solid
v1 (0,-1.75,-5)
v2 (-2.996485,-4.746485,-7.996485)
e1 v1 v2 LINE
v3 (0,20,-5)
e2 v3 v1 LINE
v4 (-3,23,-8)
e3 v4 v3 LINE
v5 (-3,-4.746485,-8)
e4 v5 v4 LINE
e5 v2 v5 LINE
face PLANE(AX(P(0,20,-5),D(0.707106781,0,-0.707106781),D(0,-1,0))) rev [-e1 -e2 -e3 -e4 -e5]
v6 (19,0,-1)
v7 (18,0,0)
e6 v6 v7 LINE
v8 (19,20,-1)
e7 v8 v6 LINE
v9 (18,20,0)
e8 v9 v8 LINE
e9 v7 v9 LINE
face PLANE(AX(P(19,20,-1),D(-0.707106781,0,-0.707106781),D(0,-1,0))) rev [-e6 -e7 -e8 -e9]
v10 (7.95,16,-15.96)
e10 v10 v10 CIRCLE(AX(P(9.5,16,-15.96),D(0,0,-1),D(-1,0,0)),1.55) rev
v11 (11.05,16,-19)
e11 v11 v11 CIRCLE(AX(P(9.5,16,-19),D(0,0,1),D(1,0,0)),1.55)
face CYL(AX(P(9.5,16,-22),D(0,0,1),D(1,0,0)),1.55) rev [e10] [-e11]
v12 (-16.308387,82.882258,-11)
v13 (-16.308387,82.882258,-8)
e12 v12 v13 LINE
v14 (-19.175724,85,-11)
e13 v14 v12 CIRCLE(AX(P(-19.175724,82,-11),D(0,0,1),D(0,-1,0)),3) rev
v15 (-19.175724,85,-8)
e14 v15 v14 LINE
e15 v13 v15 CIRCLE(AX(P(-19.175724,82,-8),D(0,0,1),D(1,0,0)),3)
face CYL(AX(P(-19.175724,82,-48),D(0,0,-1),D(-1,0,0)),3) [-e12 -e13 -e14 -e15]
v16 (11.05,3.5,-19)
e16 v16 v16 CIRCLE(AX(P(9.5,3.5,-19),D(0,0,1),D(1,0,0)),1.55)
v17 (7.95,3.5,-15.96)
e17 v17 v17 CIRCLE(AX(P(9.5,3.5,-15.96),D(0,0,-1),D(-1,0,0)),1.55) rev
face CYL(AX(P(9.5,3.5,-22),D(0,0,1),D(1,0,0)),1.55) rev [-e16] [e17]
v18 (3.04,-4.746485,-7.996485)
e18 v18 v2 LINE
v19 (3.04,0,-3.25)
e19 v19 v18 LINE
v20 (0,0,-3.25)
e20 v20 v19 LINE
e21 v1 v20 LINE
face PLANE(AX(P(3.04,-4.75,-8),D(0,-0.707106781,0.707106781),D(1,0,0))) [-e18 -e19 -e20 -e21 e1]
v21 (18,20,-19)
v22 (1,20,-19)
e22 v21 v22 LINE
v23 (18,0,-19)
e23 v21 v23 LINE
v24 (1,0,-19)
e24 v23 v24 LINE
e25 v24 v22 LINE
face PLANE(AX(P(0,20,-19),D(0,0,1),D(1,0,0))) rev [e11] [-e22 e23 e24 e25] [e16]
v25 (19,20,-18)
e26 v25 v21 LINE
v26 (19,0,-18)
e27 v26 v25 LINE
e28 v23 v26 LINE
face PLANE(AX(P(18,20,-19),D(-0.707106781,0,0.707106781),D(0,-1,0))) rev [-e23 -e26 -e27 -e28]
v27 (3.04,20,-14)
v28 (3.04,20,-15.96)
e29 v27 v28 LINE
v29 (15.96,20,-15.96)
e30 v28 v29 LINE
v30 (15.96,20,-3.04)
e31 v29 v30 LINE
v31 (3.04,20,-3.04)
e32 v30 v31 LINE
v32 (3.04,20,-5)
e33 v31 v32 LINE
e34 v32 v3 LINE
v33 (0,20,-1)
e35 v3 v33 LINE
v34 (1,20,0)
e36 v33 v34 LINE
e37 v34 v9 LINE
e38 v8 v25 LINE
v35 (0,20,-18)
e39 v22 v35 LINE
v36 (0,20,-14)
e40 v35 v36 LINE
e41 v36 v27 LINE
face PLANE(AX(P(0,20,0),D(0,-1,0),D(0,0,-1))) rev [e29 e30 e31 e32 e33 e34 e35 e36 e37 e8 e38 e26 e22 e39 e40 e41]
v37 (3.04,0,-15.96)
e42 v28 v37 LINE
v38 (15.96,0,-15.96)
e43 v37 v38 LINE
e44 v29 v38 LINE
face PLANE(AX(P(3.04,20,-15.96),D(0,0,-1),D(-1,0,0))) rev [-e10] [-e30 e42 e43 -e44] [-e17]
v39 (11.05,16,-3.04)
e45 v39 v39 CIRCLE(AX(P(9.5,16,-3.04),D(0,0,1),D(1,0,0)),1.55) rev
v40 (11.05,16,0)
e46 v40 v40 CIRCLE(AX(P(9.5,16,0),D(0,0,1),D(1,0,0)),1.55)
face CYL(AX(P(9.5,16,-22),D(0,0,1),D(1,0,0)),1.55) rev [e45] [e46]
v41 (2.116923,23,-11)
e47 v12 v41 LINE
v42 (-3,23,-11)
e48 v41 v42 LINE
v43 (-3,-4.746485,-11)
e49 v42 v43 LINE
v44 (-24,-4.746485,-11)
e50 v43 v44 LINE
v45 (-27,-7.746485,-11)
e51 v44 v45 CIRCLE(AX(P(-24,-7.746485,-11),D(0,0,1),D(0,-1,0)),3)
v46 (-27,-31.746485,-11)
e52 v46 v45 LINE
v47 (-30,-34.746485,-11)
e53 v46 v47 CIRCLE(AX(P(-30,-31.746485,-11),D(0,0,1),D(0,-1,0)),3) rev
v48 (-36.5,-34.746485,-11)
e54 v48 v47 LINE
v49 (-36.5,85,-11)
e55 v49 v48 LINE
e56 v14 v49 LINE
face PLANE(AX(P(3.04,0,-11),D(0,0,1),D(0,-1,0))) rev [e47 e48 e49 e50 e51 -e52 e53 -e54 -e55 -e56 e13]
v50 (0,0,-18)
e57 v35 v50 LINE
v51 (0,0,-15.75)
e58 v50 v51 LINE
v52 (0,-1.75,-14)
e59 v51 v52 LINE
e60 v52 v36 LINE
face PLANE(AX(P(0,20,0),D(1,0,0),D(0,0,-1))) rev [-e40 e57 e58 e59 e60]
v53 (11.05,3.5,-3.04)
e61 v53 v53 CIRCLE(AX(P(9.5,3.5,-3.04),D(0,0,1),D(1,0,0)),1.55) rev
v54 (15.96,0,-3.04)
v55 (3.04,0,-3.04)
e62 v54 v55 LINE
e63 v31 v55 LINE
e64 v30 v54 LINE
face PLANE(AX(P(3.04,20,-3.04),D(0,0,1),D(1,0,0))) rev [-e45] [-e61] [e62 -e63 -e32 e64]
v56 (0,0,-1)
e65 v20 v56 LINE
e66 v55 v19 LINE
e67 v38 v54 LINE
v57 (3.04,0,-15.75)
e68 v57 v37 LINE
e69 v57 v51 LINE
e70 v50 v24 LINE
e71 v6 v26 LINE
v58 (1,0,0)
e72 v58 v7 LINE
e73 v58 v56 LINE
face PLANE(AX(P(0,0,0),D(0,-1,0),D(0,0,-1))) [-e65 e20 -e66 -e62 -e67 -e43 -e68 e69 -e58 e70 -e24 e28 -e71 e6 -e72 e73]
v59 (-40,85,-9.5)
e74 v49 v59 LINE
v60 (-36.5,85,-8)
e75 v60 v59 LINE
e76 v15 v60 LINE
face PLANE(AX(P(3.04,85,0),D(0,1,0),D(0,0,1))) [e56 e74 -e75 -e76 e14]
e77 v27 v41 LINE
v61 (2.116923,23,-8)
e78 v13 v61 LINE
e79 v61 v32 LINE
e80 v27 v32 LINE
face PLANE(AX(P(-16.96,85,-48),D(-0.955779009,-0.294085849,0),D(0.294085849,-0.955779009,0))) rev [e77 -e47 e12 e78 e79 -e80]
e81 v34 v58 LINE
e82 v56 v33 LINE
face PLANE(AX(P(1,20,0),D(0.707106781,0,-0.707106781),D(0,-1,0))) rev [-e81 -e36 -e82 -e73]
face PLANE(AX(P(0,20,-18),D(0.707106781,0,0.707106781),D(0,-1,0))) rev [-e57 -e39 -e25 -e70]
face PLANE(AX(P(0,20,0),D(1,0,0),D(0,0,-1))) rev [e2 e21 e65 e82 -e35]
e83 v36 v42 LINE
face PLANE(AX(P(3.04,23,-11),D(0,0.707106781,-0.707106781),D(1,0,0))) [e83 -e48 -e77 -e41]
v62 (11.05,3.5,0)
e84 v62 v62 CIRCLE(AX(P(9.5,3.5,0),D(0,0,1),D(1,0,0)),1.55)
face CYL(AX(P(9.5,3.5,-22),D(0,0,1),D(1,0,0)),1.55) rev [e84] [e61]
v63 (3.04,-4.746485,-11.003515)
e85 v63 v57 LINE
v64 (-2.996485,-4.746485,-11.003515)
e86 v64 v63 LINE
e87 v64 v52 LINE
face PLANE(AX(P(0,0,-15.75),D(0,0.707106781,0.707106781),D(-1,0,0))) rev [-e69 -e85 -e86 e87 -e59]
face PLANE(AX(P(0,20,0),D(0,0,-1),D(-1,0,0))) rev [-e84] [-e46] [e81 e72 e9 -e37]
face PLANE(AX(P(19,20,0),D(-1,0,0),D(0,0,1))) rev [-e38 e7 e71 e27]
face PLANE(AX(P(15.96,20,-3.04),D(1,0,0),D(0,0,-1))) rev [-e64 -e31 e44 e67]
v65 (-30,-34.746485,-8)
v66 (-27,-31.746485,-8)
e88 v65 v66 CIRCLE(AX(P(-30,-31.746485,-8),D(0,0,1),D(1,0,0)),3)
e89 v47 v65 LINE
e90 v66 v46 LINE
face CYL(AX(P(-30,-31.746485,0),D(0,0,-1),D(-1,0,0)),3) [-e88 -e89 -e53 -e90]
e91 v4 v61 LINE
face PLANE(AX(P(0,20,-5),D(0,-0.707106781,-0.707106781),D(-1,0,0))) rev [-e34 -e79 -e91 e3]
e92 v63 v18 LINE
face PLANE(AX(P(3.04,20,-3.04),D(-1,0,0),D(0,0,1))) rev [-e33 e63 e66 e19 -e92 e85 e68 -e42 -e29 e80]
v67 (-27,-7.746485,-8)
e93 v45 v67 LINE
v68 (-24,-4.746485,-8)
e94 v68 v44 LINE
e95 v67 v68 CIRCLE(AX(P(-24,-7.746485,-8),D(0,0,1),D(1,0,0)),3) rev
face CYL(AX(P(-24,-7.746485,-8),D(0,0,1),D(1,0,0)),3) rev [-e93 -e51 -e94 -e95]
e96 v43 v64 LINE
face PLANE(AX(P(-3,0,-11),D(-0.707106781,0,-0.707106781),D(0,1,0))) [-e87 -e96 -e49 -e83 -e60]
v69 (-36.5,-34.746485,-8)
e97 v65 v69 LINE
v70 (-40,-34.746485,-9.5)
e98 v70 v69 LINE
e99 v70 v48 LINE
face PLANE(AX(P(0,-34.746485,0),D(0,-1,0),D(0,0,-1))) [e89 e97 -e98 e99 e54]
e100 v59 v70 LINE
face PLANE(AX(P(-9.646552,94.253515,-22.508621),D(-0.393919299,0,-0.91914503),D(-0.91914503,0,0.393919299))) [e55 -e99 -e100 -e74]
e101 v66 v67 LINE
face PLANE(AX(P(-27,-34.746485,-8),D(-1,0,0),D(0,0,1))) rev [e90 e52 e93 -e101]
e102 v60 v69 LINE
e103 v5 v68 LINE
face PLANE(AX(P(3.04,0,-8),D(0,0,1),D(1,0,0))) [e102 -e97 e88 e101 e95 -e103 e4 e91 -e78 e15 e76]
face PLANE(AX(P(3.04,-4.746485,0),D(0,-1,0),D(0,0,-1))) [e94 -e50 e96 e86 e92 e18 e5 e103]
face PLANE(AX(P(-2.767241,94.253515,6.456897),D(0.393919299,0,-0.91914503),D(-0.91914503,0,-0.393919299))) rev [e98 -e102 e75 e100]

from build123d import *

# Parameters (mm, degrees)
SKETCH1_W                = 19
SKETCH1_H                = 19
SKETCH1_W_2              = 12.12
SKETCH1_H_2              = 12.12
BOSS_EXTRUDE1_DEPTH      = 20
SKETCH2_R                = 1.55
CUT_EXTRUDE1_DEPTH       = 22
SKETCH3_W                = 12.92
SKETCH3_H                = 12.92
CUT_EXTRUDE2_DEPTH       = 20
BOSS_EXTRUDE2_DEPTH      = 40
BOSS_EXTRUDE2_DEPTH_BACK = 3.04
CUT_EXTRUDE3_DEPTH       = 40
SKETCH7_W                = 13
SKETCH7_H                = 3
BOSS_EXTRUDE3_DEPTH      = 30
CUT_EXTRUDE4_DEPTH       = 129
FILLET2_R                = 3
FILLET3_R                = 3
FILLET4_R                = 3
FILLET5_SIZE             = 4.75
FILLET6_SIZE             = 3
FILLET7_SIZE             = 3
FILLET8_SIZE             = 1


with BuildPart() as part:
    # Sketch1 → Boss-Extrude1 (new body)
    with BuildSketch(Plane(origin=(0, 0, 0), x_dir=(1, 0, 0), z_dir=(0, 1, 0))):
        with Locations((9.5, 9.5)):
            Rectangle(SKETCH1_W, SKETCH1_H)
        with Locations((9.5, 9.5)):
            Rectangle(SKETCH1_W_2, SKETCH1_H_2, mode=Mode.SUBTRACT)
    extrude(amount=BOSS_EXTRUDE1_DEPTH)

    # Sketch2 → Cut-Extrude1 (cut)
    with BuildSketch(Plane.XY):
        with Locations((9.5, 16)):
            Circle(SKETCH2_R)
        with Locations((9.5, 3.5)):
            Circle(SKETCH2_R)
    extrude(amount=-CUT_EXTRUDE1_DEPTH, mode=Mode.SUBTRACT)

    # Sketch3 → Cut-Extrude2 (cut)
    with BuildSketch(Plane.XZ):
        with Locations((9.5, -9.5)):
            Rectangle(SKETCH3_W, SKETCH3_H)
    extrude(amount=-CUT_EXTRUDE2_DEPTH, mode=Mode.SUBTRACT)

    # Sketch4 → Boss-Extrude2 (add, two sides: drawn at the far end of the back side and taken through both)
    with BuildSketch(Plane.ZY.offset(-BOSS_EXTRUDE2_DEPTH_BACK)):
        Polygon((-11, 70), (-11, -4.746484506), (-8, -4.746484506), (-8, 70), (-8, 85), (-11, 85), align=None)
    extrude(amount=BOSS_EXTRUDE2_DEPTH + BOSS_EXTRUDE2_DEPTH_BACK)

    # Sketch5 → Cut-Extrude3 (cut)
    with BuildSketch(Plane.XY.offset(-8)):
        Polygon((-16.96, 85), (3.04, 20), (3.04, 85), align=None)
    extrude(amount=-CUT_EXTRUDE3_DEPTH, mode=Mode.SUBTRACT)

    # Sketch7 → Boss-Extrude3 (add)
    with BuildSketch(Plane.XZ.offset(4.746484506)):
        with Locations((-33.5, -9.5)):
            Rectangle(SKETCH7_W, SKETCH7_H)
    extrude(amount=BOSS_EXTRUDE3_DEPTH)

    # Sketch8 → Cut-Extrude4 (cut)
    with BuildSketch(Plane.XZ.offset(34.746484506)):
        Polygon((-40, -8), (-40, -9.5), (-36.5, -8), align=None)
        Polygon((-36.5, -11), (-40, -9.5), (-40, -11), align=None)
    extrude(amount=-CUT_EXTRUDE4_DEPTH, mode=Mode.SUBTRACT)

    # Fillet2
    fillet2_edges = [part.edges().sort_by_distance(p)[0] for p in [
        (-27, -4.746484506, -9.5),
    ]]
    fillet(fillet2_edges, radius=FILLET2_R)

    # Fillet3
    fillet3_edges = [part.edges().sort_by_distance(p)[0] for p in [
        (-27, -34.746484506, -9.5),
    ]]
    fillet(fillet3_edges, radius=FILLET3_R)

    # Fillet4
    fillet4_edges = [part.edges().sort_by_distance(p)[0] for p in [
        (-16.96, 85, -9.5),
    ]]
    fillet(fillet4_edges, radius=FILLET4_R)

    # Fillet5
    # the kernel refuses this chamfer: 4.75 mm, written as the material it adds along each edge
    with BuildSketch(Plane(origin=(3.04, 0, -8), x_dir=(0, -0.9996219169112968, -0.027495876610586535), z_dir=(-1, 0, 0))) as fillet5_piece_1_section:
        Polygon((FILLET5_SIZE * 0.999621916911, FILLET5_SIZE * 0.0274958766106), (-FILLET5_SIZE * 0.0274958766106, FILLET5_SIZE * 0.999621916911), (0, 0), align=None)
    fillet5_piece_1 = extrude(amount=3.04, mode=Mode.PRIVATE)
    fillet5_piece_1 = split(fillet5_piece_1, bisect_by=Plane(origin=(1.52, -4.746484506, -6.430475531), z_dir=(0, 1, 0)), keep=Keep.TOP, mode=Mode.PRIVATE)
    add(fillet5_piece_1)
    with BuildSketch(Plane(origin=(0, 0, -11), x_dir=(0, 0.02749587661058637, -0.9996219169112968), z_dir=(1, 0, 0))) as fillet5_piece_2_section:
        Polygon((FILLET5_SIZE * 0.999621916911, -FILLET5_SIZE * 0.0274958766106), (-FILLET5_SIZE * 0.0274958766106, -FILLET5_SIZE * 0.999621916911), (0, 0), align=None)
    fillet5_piece_2 = extrude(amount=3.04, mode=Mode.PRIVATE)
    fillet5_piece_2 = split(fillet5_piece_2, bisect_by=Plane(origin=(1.52, -4.746484506, -12.569524469), z_dir=(0, 1, 0)), keep=Keep.TOP, mode=Mode.PRIVATE)
    add(fillet5_piece_2)

    # Fillet6
    fillet6_edges = [part.edges().sort_by_distance(p)[0] for p in [
        (1.52, 20, -11),
        (1.52, 20, -8),
    ]]
    chamfer(fillet6_edges, length=FILLET6_SIZE)

    # Fillet7
    fillet7_edges = [part.edges().sort_by_distance(p)[0] for p in [
        (0, 9.126757747, -11),
        (0, 9.126757747, -8),
    ]]
    chamfer(fillet7_edges, length=FILLET7_SIZE)

    # Fillet8
    fillet8_edges = [part.edges().sort_by_distance(p)[0] for p in [
        (0, 10, -19),
        (19, 10, -19),
        (19, 10, 0),
        (0, 10, 0),
    ]]
    chamfer(fillet8_edges, length=FILLET8_SIZE)


solid = part.part
